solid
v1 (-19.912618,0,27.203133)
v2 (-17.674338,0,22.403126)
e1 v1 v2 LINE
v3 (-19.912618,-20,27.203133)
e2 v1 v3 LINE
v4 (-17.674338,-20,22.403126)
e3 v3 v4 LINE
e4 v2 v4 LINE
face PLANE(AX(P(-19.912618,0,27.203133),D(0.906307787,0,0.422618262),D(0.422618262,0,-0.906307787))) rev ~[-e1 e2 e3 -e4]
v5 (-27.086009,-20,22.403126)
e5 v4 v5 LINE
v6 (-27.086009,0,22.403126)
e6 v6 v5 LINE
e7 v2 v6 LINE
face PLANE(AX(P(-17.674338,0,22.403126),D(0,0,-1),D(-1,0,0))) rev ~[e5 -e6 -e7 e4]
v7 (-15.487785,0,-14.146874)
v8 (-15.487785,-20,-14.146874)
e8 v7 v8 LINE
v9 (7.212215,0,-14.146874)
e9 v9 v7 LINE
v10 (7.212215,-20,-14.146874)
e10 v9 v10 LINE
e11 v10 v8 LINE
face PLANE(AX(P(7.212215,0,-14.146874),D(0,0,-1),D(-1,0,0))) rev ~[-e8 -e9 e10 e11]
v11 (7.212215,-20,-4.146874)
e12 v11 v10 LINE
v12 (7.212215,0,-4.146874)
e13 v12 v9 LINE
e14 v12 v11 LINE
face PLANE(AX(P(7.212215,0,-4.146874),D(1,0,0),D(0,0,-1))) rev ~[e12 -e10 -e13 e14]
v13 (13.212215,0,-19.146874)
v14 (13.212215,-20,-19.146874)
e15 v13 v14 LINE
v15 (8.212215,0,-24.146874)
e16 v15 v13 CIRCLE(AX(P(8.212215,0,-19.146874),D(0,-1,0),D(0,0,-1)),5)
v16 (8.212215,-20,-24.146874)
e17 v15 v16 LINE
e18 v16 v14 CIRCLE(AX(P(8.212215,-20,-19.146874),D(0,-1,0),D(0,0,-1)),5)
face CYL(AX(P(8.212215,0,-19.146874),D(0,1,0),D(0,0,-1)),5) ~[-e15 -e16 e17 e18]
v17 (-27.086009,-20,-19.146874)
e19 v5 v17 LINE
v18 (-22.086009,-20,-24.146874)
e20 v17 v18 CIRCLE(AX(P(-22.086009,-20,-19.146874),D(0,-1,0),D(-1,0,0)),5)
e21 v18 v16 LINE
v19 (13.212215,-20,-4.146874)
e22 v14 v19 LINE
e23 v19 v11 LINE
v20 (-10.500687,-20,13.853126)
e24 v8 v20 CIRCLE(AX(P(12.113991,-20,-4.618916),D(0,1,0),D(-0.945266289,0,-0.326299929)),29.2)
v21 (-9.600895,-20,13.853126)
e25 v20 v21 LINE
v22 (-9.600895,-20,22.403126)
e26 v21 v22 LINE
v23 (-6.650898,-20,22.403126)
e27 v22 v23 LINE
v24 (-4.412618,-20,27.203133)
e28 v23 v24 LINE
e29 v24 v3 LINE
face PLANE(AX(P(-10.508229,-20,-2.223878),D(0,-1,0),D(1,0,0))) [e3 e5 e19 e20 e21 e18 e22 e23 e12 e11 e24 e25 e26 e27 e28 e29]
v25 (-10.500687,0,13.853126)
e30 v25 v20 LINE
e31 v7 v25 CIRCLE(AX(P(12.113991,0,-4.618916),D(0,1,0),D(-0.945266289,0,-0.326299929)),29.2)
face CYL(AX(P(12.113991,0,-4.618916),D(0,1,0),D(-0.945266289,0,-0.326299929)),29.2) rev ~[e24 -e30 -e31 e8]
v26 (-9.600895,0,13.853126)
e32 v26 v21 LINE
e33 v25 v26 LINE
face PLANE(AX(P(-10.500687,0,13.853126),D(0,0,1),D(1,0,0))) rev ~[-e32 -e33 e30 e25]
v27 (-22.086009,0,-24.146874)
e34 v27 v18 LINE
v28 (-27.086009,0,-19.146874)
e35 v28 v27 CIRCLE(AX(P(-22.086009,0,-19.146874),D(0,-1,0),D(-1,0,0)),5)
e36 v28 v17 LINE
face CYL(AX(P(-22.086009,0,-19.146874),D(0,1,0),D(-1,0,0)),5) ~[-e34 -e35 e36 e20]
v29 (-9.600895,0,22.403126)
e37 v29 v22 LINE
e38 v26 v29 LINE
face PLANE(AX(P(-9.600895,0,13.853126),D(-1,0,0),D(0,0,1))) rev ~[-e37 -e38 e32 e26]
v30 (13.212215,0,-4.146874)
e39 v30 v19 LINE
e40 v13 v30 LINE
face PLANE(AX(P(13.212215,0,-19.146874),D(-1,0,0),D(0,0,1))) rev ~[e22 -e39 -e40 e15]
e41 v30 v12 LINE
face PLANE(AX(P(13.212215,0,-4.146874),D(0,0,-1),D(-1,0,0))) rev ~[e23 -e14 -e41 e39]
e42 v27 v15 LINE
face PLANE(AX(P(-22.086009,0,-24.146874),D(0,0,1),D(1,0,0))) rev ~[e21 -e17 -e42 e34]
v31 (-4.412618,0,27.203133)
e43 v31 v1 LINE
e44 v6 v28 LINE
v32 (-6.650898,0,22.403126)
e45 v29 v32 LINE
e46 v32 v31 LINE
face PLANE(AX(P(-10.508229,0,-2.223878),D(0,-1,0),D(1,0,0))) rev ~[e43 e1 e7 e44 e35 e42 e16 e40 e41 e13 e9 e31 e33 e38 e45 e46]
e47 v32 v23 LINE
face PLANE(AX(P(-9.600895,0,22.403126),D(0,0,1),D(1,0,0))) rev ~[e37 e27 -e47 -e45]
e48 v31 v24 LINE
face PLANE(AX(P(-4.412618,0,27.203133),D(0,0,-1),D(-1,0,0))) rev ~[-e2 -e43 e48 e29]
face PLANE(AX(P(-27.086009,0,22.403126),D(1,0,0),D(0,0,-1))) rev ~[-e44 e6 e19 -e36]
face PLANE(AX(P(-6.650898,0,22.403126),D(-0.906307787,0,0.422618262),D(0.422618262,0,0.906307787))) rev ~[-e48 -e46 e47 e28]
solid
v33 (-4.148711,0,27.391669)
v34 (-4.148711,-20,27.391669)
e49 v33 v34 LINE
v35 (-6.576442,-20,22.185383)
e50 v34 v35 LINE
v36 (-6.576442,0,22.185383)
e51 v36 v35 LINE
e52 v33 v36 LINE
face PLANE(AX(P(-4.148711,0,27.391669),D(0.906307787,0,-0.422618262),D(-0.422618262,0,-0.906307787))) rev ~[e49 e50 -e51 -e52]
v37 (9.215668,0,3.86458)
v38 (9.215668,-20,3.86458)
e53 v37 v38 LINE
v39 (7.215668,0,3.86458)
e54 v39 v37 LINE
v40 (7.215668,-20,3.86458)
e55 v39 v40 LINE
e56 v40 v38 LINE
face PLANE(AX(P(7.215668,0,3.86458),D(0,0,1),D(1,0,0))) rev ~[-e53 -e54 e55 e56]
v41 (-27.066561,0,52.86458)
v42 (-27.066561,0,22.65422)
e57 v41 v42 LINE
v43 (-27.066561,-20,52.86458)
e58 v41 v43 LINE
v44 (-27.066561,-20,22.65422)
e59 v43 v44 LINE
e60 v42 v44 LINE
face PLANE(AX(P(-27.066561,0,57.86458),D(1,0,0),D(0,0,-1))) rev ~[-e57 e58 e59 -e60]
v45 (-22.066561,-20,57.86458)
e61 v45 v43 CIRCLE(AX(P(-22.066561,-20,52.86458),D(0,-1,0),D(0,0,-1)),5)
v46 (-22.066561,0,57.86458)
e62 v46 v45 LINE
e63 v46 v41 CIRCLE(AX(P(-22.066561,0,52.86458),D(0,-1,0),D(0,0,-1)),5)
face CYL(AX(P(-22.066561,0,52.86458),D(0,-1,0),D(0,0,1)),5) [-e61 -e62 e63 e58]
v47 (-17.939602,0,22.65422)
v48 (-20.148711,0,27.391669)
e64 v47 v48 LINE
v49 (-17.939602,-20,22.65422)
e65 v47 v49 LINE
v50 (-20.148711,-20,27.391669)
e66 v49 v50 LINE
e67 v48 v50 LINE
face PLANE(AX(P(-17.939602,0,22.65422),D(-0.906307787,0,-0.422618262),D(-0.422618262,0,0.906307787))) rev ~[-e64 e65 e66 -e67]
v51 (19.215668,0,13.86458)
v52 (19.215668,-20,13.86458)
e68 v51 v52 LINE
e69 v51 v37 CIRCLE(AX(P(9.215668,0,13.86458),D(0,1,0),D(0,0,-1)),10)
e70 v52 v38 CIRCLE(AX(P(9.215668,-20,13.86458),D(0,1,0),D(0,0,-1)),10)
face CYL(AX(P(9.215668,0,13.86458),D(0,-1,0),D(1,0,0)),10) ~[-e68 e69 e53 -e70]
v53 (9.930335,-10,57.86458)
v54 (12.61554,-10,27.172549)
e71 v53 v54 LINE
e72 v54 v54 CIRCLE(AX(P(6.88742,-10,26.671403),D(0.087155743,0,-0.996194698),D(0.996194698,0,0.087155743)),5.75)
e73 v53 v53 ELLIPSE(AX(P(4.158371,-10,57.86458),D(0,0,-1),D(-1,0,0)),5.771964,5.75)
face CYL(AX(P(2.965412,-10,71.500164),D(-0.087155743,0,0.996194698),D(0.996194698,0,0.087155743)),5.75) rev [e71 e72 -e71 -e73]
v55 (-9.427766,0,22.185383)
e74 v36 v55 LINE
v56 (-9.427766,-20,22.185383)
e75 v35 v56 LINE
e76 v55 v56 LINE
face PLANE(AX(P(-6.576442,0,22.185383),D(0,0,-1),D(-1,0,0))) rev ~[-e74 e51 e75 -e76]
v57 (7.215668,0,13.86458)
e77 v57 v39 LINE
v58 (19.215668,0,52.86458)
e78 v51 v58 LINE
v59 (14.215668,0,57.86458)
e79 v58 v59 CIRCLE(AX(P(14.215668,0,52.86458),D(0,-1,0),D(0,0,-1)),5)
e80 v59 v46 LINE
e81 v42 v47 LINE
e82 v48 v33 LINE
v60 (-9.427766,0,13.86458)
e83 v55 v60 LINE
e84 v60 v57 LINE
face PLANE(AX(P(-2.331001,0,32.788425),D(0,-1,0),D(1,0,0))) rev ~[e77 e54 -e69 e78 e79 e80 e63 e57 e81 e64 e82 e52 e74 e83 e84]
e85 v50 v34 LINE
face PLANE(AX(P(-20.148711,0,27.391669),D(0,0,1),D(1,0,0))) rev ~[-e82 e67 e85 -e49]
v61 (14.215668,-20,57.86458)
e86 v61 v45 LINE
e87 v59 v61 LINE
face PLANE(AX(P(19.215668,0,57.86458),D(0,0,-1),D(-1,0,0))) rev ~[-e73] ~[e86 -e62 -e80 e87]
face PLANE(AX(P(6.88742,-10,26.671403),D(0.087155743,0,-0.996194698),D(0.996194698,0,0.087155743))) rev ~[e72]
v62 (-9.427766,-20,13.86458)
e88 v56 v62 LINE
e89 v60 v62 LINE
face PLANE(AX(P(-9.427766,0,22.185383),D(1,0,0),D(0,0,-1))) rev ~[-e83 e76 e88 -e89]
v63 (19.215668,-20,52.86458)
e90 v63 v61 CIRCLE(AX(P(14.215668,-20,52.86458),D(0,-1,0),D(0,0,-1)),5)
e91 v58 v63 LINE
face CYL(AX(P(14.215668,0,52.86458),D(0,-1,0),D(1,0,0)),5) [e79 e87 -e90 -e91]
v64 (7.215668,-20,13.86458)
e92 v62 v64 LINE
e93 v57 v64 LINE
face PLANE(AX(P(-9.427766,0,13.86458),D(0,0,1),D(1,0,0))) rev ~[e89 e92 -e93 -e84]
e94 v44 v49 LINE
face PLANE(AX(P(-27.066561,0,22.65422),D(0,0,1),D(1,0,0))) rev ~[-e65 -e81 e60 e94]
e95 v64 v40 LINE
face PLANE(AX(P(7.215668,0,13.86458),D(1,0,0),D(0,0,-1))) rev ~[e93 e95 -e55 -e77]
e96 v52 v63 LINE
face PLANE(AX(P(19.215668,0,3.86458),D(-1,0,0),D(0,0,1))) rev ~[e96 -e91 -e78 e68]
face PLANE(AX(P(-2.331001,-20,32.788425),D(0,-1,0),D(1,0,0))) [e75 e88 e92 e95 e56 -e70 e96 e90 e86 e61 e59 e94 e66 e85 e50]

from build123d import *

# Parameters (mm, degrees)
F2_DEPTH = 20
F3_DEPTH = 20
F6_R     = 5.75
F7_DEPTH = 45
F8_R     = 5
F9_R     = 10


# Not quite as in the source:
# - ends of sketch curves that miss each other by under 0.0002 mm in the source are joined


with BuildPart() as f2:
    # F0 (on Front) → F2 (new body)
    with BuildSketch(Plane.XZ):
        with BuildLine():
            Line((-17.6743378025, 22.4031258792), (-27.0860093031, 22.4031258792))
            Line((-27.0860093031, 22.4031258792), (-27.0860093031, -19.1468741208))
            ThreePointArc((-27.0860093031, -19.1468741208), (-25.6215432091, -22.6824080268), (-22.0860093031, -24.1468741208))
            Line((-22.0860093031, -24.1468741208), (8.2122150655, -24.1468741208))
            ThreePointArc((8.2122150655, -24.1468741208), (11.7477489715, -22.6824080268), (13.2122150655, -19.1468741208))
            Line((13.2122150655, -19.1468741208), (13.2122150655, -4.1468741208))
            Line((13.2122150655, -4.1468741208), (7.2122150655, -4.1468741208))
            Line((7.2122150655, -4.1468741208), (7.2122150655, -14.1468741208))
            Line((7.2122150655, -14.1468741208), (-15.4877849345, -14.1468741208))
            ThreePointArc((-15.4877849345, -14.1468741208), (-16.633584051, 0.5013324305), (-10.5006873054, 13.8531258792))
            Line((-10.5006873054, 13.8531258792), (-9.6008945616, 13.8531258792))
            Line((-9.6008945616, 13.8531258792), (-9.6008945616, 22.4031258792))
            Line((-9.6008945616, 22.4031258792), (-6.6508978025, 22.4031258792))
            Line((-6.6508978025, 22.4031258792), (-4.4126178025, 27.2031328292))
            Line((-4.4126178025, 27.2031328292), (-19.9126178025, 27.2031328292))
            Line((-19.9126178025, 27.2031328292), (-17.6743378025, 22.4031258792))
        make_face()
    extrude(amount=F2_DEPTH)


with BuildPart() as f3:
    # F1 (on Front) → F3 (new body)
    with BuildSketch(Plane.XZ):
        Polygon((-9.4277657694, 13.8645800784), (7.2156684956, 13.8645800784), (7.2156684956, 3.8645800784), (19.2156684956, 3.8645800784), (19.2156684956, 57.8645800784), (-27.0665612229, 57.8645800784), (-27.0665612229, 22.6542197451), (-17.9396021321, 22.6542197451), (-20.1487108764, 27.3916687354), (-4.1487108764, 27.3916687354), (-6.5764416154, 22.1853833646), (-9.4277657694, 22.1853833646), align=None)
    extrude(amount=F3_DEPTH)

    # F6 (on face) → F7 (cut)
    with BuildSketch(Plane(origin=(-6.1854109913, 0, 70.6995711451), x_dir=(0.9961946981, 0, 0.0871557427), z_dir=(0.0871557427, 0, -0.9961946981))):
        with Locations((9.1857775311, 10)):
            Circle(F6_R)
    extrude(amount=F7_DEPTH, mode=Mode.SUBTRACT)

    # F8
    f8_edges = [f3.edges().sort_by_distance(p)[0] for p in [
        (-27.066561, -10, 57.86458),
        (19.215668, -10, 57.86458),
    ]]
    fillet(f8_edges, radius=F8_R)

    # F9
    f9_edges = [f3.edges().sort_by_distance(p)[0] for p in [
        (19.215668, -10, 3.86458),
    ]]
    fillet(f9_edges, radius=F9_R)


solid = Compound([f2.part, f3.part])
